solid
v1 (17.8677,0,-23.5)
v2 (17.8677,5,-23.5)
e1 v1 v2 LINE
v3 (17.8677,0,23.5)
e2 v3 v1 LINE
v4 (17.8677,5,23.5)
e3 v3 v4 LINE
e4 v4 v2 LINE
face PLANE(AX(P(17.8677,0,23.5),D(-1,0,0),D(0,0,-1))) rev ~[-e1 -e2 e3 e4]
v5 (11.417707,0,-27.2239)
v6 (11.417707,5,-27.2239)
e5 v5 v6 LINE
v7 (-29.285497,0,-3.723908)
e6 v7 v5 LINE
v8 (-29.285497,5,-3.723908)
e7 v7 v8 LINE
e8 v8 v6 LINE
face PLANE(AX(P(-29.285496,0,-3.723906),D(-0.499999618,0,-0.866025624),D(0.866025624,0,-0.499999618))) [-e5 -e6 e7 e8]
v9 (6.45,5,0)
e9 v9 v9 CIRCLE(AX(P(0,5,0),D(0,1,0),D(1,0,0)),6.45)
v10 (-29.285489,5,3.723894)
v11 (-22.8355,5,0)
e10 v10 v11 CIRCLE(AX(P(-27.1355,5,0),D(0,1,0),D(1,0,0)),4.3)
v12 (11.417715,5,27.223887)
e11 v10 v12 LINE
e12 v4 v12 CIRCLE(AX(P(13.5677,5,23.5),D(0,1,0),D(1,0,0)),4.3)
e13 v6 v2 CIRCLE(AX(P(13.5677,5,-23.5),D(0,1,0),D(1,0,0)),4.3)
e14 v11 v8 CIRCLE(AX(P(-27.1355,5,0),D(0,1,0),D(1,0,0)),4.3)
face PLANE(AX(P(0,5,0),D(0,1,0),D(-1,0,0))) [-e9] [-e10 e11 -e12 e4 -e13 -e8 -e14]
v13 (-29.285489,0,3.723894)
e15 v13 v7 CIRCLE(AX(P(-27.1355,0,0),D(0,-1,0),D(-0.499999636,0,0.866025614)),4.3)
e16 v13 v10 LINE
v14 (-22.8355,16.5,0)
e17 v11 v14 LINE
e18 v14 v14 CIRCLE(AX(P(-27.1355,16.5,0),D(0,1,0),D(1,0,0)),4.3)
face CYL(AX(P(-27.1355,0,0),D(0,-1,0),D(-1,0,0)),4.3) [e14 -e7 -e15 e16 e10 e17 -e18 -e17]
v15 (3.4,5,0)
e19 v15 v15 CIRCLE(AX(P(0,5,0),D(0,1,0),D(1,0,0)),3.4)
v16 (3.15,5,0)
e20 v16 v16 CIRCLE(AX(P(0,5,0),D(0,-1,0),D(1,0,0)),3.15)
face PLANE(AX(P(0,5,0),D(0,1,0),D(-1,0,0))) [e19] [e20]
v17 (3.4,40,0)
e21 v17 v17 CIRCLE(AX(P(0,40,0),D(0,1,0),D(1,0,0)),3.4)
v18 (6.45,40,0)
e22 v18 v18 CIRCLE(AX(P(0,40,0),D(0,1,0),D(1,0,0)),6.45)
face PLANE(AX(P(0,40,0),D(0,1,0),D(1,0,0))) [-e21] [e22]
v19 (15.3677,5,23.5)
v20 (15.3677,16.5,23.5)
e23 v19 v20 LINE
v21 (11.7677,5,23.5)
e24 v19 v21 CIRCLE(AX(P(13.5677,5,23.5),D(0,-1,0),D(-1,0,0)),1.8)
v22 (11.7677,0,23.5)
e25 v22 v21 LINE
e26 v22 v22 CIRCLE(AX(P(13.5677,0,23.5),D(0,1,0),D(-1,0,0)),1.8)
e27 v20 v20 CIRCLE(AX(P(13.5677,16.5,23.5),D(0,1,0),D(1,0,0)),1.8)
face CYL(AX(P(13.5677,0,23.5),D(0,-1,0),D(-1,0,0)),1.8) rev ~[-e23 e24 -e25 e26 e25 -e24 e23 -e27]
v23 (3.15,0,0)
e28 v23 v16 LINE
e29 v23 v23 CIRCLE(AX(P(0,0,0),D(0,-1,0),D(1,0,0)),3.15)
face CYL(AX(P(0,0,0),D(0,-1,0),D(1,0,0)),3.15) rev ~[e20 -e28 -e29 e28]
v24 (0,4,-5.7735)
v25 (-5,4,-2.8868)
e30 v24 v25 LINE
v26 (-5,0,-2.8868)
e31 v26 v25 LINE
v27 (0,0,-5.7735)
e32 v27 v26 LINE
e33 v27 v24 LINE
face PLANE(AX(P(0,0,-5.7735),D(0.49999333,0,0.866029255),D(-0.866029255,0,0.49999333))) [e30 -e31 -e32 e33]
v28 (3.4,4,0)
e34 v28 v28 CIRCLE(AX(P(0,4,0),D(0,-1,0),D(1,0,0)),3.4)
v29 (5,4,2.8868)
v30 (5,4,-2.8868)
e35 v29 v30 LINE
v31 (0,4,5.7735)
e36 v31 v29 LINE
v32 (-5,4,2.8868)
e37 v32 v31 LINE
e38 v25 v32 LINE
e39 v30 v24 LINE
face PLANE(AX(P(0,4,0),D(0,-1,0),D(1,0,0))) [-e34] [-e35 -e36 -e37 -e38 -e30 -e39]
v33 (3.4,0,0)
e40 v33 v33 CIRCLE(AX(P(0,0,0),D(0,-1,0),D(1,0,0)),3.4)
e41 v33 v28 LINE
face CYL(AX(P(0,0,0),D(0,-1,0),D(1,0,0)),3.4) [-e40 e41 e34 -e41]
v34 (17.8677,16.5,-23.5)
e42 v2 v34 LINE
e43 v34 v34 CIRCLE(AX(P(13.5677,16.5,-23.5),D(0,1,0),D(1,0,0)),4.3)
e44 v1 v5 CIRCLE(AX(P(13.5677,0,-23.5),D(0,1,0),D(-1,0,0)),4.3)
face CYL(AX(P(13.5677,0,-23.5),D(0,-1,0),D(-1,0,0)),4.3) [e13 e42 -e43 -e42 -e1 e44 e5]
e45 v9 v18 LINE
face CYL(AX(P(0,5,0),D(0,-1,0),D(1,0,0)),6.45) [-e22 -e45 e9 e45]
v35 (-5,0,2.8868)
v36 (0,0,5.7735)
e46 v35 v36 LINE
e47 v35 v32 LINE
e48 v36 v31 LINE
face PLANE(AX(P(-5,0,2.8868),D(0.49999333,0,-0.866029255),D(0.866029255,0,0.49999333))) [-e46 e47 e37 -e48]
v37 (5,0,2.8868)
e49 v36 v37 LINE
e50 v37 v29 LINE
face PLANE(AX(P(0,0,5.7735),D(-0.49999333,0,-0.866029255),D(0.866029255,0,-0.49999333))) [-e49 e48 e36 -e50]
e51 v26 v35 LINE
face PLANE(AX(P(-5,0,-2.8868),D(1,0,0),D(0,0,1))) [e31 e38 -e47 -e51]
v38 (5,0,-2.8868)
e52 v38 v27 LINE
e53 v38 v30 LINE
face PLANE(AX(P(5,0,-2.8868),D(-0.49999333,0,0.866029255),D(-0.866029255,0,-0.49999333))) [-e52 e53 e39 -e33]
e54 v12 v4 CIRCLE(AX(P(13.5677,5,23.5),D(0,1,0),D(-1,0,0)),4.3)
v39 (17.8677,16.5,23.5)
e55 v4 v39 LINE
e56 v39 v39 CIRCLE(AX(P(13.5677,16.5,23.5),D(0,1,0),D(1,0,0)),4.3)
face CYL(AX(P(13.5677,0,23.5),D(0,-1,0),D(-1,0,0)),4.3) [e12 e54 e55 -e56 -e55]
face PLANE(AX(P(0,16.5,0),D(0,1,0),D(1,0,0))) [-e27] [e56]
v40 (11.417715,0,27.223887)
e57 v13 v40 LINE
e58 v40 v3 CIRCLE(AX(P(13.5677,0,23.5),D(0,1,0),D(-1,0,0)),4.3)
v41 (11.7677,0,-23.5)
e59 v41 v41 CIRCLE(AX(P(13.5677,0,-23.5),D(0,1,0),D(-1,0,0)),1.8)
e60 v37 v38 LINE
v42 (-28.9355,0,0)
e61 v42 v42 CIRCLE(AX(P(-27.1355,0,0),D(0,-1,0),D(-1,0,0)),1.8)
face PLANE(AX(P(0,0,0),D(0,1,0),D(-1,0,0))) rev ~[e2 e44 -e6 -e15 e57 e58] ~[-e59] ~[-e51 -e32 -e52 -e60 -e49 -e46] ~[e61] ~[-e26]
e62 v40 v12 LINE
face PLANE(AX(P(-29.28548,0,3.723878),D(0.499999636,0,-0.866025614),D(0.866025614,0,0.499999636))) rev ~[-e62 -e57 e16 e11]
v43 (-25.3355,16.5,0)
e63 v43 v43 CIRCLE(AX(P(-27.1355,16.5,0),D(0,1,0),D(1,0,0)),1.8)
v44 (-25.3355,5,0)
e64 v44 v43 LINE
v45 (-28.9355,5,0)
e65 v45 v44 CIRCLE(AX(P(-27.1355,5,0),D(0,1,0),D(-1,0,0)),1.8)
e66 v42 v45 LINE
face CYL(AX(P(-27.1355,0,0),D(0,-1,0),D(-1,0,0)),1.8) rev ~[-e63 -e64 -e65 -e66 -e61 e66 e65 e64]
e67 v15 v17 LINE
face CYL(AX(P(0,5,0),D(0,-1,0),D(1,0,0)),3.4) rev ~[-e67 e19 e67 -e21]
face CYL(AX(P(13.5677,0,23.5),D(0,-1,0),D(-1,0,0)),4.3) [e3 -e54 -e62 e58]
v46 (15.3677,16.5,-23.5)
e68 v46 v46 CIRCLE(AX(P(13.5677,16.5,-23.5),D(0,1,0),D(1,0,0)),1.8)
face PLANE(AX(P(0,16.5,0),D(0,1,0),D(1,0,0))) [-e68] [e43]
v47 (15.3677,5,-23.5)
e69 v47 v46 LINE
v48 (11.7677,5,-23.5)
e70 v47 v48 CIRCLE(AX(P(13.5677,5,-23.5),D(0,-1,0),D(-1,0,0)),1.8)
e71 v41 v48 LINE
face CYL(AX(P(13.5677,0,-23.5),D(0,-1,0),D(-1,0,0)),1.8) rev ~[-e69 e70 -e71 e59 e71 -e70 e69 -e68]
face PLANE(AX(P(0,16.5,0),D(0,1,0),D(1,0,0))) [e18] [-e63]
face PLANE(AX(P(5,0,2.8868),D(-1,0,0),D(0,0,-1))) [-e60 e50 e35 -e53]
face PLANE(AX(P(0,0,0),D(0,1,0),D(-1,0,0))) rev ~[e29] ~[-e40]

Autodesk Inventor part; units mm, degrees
ref_plane "YZ Plane" through (0, 0, 0) normal (1, 0, 0) x (0, 1, 0)
ref_plane "XZ Plane" through (0, 0, 0) normal (0, 1, 0) x (-1, 0, 0)
ref_plane "XY Plane" through (0, 0, 0) normal (0, 0, 1) x (1, 0, 0)
sketch "Sketch1" plane through (0, 0, 0) normal (0, 1, 0) x (-1, 0, 0)
  line L0 (27.1355, 0) -> (-13.5677, -23.5)
  line L1 (-13.5677, -23.5) -> (-13.5677, 23.5)
  line L2 (-13.5677, 23.5) -> (27.1355, 0)
  circle A0 centre (27.1355, 0) radius 1.8
  circle A1 centre (-13.5677, -23.5) radius 1.8
  circle A2 centre (-13.5677, 23.5) radius 1.8
  circle A3 centre (-13.5677, 23.5) radius 4.3
  circle A4 centre (-13.5677, -23.5) radius 4.3
  circle A5 centre (27.1355, 0) radius 4.3
  line L3 (37.2914, 0.8983) -> (-23.0689, -33.9507)
  line L4 (-17.8677, 35.8999) -> (-17.8677, -40.3839)
  line L5 (38.4842, -1.587) -> (-21.5839, 33.0933)
  point P0 (0, 0)
  point P1 (0, 0)
  point P2 (-11.4177, -27.2239)
  point P3 (29.2855, -3.7239)
  point P4 (29.2855, 3.7239)
  point P5 (-11.4177, 27.2239)
  point P6 (-17.8677, 23.5)
  point P7 (-17.8677, -23.5)
  dimension "d0" = 47
  dimension "d1" = 3.6
  dimension "d2" = 3.6
  dimension "d3" = 3.6
  dimension "d4" = 8.6
  dimension "d5" = 8.6
  dimension "d6" = 8.6
extrude "Extrusion1" add sketch "Sketch1" along normal blind 5 contours A0 L2 A5 L0 | L0 A5 L2 A0 | A5 L3 A4 L0 | L0 A4 L1 A3 L2 A5 | L2 A3 L5 A5 | A4 L1 A1 L0 | L0 A1 L1 A4 | A3 L1 A2 L2 | L2 A2 L1 A3 | A4 L4 A3 L1
sketch "Sketch2" plane through (0, 5, 0) normal (0, 1, 0) x (1, 0, 0)
  circle A0 centre (-27.1355, 0) radius 1.8 projected
  circle A1 centre (-27.1355, 0) radius 4.3
  circle A2 centre (13.5677, 23.5) radius 4.3
  circle A3 centre (13.5677, 23.5) radius 1.8 projected
  circle A4 centre (13.5677, -23.5) radius 1.8 projected
  line L0 (17.8677, -23.5) -> (17.8677, 23.5) projected
  circle A5 centre (13.5677, -23.5) radius 4.3
  point P0 (0, 0)
  dimension "d9" = 8.6
  dimension "d21" = 8.6
  dimension "d22" = 8.6
extrude "Extrusion2" add sketch "Sketch2" along normal blind 11.5
sketch "Sketch3" plane through (0, 5, 0) normal (0, 1, 0) x (1, 0, 0)
  circle A0 centre (0, 0) radius 3.4
  circle A1 centre (0, 0) radius 6.45
  dimension "d12" = 6.8
  dimension "d13" = 12.9
extrude "Extrusion3" add sketch "Sketch3" along normal blind 35
sketch "Sketch4" plane through (0, 0, 0) normal (0, -1, 0) x (1, 0, 0)
  circle A0 centre (0, 0) radius 3.15
  dimension "d23" = 6.3
extrude "Extrusion4" cut sketch "Sketch4" against normal blind 36
sketch "Sketch5" plane through (0, 0, 0) normal (0, -1, 0) x (1, 0, 0)
  circle A0 centre (0, 0) radius 3.4 projected
  line L0 (-5, 2.8868) -> (0, 5.7735)
  line L1 (0, 5.7735) -> (5, 2.8868)
  line L2 (5, 2.8868) -> (5, -2.8868)
  line L3 (5, -2.8868) -> (0, -5.7735)
  line L4 (0, -5.7735) -> (-5, -2.8868)
  line L5 (-5, -2.8868) -> (-5, 2.8868)
  dimension "d18" = 10
extrude "Extrusion5" cut sketch "Sketch5" against normal blind 4
equation "\"d21\" = d9"
equation "\"d22\" = d9"
properties part number "wheel_block"
